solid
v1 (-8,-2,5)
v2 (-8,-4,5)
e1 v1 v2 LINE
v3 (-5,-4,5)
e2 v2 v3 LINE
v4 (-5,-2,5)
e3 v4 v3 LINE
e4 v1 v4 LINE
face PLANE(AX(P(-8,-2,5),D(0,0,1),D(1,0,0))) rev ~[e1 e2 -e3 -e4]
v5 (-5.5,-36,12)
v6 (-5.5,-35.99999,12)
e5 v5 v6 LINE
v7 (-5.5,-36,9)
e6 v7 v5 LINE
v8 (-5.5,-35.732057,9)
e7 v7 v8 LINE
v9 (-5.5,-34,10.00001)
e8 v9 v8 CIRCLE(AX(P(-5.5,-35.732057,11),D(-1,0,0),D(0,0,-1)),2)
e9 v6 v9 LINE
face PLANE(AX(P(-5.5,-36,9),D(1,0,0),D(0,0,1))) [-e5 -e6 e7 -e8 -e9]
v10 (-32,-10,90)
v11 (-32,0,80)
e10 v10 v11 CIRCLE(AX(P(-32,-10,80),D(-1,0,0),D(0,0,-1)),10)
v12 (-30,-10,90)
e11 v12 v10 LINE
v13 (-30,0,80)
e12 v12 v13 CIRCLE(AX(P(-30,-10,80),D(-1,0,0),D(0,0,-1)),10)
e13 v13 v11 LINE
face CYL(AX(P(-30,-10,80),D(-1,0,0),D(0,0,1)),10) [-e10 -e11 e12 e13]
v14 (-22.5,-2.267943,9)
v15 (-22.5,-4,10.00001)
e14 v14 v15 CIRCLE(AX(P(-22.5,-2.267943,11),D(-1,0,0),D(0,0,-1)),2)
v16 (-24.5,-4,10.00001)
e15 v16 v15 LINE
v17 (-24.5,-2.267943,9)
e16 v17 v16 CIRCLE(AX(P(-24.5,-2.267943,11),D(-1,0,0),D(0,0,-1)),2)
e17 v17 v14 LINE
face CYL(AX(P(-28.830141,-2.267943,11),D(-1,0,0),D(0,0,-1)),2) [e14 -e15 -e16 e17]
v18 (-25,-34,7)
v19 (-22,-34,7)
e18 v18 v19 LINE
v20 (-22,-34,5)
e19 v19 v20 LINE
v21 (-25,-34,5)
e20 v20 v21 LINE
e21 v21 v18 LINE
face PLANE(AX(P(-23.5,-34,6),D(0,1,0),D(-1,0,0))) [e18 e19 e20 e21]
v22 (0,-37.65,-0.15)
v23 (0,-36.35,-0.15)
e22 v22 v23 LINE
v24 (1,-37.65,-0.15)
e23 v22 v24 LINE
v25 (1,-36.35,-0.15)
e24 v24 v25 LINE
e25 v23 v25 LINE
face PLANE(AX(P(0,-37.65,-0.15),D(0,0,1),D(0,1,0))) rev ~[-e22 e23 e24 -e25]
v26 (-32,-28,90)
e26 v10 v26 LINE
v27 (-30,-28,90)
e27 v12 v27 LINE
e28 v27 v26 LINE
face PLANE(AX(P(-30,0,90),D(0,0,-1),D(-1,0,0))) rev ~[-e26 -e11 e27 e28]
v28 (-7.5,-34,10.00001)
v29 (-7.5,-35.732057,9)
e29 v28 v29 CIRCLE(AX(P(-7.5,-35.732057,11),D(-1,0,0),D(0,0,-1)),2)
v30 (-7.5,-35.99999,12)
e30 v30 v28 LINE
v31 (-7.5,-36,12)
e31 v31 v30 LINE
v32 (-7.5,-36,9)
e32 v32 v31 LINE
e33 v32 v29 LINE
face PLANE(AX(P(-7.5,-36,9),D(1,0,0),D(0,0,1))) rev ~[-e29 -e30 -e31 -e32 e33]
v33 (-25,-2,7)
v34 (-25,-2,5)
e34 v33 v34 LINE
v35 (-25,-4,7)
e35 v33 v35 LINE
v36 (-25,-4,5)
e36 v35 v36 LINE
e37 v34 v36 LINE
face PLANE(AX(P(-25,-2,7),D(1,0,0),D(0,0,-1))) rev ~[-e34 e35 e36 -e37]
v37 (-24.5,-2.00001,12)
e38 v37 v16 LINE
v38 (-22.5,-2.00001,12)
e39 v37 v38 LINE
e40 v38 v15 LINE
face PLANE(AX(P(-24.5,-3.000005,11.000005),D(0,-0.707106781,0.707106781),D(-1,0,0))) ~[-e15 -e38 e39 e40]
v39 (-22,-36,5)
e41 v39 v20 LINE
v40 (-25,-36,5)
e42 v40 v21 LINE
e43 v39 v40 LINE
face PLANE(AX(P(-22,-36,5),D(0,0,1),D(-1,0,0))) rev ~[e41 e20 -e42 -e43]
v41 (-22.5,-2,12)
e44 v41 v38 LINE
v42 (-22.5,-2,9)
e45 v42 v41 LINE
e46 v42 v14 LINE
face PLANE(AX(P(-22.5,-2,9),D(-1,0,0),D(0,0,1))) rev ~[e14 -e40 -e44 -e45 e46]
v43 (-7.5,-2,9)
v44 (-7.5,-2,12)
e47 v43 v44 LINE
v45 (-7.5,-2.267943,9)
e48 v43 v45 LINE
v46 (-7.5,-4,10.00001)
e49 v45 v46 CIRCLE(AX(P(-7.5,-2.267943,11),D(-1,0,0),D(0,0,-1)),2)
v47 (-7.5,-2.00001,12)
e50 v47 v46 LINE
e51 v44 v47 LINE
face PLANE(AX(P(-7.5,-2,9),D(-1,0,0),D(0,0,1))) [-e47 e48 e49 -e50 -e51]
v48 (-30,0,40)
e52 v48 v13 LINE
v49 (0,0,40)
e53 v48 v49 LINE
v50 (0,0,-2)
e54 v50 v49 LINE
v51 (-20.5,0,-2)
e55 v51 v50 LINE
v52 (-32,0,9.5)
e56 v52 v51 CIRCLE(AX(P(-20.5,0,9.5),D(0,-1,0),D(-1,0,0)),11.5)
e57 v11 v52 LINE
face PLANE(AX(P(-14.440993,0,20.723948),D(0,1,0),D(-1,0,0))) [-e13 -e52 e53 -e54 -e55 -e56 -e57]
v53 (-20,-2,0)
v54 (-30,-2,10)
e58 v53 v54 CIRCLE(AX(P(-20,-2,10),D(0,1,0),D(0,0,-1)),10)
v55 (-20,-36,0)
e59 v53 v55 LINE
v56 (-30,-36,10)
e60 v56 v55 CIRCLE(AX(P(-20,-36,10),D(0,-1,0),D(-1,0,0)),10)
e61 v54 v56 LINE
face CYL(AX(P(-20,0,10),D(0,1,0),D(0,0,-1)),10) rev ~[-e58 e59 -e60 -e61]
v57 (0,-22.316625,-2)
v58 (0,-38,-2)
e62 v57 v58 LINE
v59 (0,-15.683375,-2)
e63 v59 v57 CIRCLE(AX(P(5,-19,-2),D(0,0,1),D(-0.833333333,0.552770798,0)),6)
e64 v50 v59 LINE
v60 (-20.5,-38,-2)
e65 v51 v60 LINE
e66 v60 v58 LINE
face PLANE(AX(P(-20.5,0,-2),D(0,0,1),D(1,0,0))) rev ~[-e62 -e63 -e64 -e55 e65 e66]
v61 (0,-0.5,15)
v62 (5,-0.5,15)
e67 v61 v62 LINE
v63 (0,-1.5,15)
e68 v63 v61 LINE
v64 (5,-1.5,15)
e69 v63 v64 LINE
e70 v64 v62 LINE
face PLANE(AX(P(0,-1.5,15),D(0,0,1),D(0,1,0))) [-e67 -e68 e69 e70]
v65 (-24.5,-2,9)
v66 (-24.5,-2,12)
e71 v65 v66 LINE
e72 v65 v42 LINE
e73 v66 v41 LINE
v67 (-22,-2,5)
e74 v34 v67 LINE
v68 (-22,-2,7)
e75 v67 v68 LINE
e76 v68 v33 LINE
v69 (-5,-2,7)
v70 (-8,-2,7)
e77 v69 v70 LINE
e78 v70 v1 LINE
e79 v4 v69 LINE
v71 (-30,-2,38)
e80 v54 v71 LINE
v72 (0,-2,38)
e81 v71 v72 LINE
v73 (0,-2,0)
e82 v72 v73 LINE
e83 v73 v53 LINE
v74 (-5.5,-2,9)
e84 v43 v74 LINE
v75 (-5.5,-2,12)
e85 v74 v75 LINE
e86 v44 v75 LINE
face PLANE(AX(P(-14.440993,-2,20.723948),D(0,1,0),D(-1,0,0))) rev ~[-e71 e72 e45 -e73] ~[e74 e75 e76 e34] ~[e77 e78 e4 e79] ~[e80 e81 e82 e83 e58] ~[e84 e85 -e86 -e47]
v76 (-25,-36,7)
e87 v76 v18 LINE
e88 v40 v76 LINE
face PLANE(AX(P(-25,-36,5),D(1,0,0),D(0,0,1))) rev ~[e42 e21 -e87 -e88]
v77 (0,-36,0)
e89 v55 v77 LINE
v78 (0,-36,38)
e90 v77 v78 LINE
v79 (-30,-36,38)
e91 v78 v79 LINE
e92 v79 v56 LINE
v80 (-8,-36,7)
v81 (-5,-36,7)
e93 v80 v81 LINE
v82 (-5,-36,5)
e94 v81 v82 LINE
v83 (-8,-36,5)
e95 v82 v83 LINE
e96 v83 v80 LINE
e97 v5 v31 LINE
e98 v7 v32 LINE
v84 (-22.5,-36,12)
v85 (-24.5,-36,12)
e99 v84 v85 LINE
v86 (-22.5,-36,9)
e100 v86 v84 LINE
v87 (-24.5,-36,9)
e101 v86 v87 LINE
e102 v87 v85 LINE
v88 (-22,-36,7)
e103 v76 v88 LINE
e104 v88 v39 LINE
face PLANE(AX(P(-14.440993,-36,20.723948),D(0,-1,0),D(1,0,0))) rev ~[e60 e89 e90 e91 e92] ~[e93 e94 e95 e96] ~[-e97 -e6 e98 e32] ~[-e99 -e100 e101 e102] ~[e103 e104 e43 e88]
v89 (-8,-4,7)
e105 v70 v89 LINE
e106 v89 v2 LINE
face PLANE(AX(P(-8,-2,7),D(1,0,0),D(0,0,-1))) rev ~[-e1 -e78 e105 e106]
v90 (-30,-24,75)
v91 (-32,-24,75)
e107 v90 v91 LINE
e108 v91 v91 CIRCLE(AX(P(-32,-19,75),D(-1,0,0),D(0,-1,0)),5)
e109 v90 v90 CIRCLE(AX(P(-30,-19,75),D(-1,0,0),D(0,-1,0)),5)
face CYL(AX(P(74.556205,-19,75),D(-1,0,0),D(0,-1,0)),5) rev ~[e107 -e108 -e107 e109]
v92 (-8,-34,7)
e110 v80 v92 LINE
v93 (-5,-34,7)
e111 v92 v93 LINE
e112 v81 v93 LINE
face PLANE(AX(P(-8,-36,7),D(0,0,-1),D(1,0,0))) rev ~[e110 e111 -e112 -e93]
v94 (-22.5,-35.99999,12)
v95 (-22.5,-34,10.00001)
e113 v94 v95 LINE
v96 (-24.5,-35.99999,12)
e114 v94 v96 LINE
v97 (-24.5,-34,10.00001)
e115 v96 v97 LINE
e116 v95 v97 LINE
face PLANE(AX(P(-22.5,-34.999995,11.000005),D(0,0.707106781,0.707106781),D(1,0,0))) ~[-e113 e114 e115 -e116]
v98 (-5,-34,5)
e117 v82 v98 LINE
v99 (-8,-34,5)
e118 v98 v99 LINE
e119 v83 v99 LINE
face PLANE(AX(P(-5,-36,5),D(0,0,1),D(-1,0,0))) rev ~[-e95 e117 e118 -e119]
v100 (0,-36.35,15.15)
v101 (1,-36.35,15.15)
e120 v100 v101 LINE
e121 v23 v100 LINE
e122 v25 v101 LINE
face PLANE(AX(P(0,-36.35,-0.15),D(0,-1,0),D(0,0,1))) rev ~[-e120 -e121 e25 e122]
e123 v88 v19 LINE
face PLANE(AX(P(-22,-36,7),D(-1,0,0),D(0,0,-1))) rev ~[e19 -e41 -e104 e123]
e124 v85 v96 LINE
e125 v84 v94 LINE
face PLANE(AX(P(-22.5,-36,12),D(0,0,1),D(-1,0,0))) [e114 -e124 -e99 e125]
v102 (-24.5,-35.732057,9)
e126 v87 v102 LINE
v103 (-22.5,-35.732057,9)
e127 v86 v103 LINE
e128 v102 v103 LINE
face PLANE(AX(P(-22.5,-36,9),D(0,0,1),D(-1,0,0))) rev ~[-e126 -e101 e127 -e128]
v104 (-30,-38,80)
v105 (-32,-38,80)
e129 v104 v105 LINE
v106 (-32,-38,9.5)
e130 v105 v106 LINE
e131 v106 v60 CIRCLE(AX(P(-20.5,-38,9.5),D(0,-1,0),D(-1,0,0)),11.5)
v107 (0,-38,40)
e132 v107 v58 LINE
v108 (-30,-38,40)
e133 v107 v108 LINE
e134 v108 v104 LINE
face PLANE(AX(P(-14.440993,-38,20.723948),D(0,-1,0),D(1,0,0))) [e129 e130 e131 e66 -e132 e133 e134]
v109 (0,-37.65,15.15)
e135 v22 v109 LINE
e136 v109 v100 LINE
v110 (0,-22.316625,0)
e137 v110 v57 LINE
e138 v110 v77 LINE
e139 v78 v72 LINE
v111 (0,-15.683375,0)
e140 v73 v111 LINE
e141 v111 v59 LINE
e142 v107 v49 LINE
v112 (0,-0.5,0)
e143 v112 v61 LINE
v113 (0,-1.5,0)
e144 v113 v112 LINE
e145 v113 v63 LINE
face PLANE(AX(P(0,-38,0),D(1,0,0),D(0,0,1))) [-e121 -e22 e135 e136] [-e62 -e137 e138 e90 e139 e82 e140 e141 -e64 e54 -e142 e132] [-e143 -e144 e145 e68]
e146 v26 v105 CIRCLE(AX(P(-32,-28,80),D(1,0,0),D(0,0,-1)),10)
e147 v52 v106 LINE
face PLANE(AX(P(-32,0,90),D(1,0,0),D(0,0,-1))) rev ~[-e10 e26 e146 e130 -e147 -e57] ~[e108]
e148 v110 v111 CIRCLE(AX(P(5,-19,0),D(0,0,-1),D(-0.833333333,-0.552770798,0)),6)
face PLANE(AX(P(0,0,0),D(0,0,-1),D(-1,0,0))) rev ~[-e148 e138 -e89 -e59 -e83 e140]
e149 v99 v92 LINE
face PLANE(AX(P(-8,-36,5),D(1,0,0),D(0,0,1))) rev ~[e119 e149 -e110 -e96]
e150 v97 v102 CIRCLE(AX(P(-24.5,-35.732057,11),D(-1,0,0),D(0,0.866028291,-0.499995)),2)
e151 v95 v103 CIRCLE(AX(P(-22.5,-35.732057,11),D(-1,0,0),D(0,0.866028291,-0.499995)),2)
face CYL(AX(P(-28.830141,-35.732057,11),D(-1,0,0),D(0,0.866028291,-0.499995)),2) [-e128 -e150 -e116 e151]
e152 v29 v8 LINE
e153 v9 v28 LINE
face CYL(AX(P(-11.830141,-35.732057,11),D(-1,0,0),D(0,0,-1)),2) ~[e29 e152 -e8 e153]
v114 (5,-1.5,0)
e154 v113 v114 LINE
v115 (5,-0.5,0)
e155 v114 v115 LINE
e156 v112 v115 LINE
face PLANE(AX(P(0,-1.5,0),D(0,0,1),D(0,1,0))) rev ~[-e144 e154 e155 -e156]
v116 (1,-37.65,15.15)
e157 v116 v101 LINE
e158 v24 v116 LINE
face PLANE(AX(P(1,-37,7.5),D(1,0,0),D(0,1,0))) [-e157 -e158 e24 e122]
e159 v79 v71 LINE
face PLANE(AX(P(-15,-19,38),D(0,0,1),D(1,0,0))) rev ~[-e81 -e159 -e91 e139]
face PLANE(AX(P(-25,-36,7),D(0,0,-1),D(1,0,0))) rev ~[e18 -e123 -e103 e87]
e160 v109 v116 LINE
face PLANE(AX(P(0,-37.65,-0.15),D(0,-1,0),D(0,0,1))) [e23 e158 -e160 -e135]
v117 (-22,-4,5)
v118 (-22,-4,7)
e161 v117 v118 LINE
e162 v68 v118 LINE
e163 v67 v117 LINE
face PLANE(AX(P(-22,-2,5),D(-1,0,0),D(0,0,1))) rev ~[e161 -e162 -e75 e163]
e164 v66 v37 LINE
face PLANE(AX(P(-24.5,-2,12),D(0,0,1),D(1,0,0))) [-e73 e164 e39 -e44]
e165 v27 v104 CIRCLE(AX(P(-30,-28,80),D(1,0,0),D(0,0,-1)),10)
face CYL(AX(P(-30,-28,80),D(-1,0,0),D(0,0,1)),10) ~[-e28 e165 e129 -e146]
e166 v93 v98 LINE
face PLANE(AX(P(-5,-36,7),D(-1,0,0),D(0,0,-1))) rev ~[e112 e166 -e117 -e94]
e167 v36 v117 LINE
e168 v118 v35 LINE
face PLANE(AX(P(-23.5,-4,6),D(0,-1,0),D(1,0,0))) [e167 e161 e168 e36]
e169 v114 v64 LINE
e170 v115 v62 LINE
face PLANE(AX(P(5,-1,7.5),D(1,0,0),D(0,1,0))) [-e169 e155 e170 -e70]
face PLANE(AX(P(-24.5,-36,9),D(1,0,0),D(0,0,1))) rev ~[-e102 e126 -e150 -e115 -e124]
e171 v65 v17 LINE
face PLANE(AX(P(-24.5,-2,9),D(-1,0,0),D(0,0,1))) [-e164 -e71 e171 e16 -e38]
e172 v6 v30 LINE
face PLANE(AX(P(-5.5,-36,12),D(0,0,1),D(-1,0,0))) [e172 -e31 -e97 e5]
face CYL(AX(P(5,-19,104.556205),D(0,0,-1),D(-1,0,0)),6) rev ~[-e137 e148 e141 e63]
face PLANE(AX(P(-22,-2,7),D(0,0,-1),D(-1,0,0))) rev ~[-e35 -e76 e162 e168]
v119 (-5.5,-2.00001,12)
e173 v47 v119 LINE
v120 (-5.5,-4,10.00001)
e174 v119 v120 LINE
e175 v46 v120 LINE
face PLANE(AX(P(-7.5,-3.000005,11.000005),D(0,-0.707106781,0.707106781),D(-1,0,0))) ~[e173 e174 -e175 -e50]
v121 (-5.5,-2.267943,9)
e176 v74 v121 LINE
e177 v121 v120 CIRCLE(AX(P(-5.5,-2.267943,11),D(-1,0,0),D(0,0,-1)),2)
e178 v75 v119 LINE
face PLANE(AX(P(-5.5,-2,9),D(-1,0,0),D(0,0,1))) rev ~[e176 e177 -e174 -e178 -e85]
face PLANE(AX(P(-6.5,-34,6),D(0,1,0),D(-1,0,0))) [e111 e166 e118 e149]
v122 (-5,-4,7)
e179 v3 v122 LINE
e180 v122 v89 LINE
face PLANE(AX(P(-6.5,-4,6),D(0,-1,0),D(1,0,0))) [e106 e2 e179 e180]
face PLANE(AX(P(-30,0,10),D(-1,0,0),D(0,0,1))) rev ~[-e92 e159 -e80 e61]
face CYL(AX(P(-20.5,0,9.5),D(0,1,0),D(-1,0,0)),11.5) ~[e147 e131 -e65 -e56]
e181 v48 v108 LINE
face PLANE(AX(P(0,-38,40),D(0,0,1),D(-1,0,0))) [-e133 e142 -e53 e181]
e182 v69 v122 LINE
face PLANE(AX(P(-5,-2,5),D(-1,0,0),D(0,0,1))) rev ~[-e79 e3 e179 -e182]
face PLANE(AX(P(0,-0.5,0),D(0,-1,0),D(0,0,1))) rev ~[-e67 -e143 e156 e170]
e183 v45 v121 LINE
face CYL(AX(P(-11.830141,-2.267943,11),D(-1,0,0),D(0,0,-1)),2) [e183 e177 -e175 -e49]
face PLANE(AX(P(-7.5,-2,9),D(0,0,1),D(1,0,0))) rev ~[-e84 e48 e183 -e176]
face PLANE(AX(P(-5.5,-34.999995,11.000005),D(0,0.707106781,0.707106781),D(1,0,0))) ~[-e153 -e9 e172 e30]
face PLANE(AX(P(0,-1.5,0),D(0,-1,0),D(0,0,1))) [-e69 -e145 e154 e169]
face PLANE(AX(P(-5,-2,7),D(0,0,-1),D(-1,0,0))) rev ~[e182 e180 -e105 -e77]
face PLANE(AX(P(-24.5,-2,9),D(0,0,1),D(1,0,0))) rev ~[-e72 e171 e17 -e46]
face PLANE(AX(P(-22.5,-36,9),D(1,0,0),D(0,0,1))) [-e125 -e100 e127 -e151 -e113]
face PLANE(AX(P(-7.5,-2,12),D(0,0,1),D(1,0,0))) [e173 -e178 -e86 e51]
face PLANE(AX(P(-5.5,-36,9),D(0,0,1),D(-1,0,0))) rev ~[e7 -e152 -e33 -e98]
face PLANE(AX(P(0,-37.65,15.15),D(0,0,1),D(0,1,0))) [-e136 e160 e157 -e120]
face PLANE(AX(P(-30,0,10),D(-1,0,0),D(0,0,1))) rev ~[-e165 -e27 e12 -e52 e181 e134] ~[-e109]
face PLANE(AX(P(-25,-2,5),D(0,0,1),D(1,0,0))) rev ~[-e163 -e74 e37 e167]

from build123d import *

# Parameters (mm, degrees)
F1_DEPTH     = 38
F3_D         = 12
F4_R         = 10
F6_D         = 10
F8_DEPTH     = 2
F10_DEPTH    = 2
F11_W        = 30
F11_H        = 38
F12_DEPTH    = 2
F14_W        = 1
F14_H        = 15
F15_DEPTH    = 5
F16_W        = 2
F16_H        = 3
F18_DEPTH    = 2
F17_W        = 2
F17_H        = 3
F19_DEPTH    = 2
F20_SIZE     = 1.99999
F21_T1_DEPTH = 10.6602829052
F21_T3_DEPTH = 10.6602829052
F14_W_2      = 1.3
F14_H_2      = 15.3
F22_DEPTH    = 1


# Not quite as in the source:
# - a fillet or chamfer that OpenCascade refuses, or shapes differently, is made with other operations: its cross-section is extruded or revolved along the edge and cut away or added
# - a fillet or chamfer is up to 0.001 mm smaller than in the source, because OpenCascade refuses the exact size
# - a feature names something its author has since deleted; it is built from what else it names


with BuildPart() as f1:
    # F0 (on Front) → F1 (new body)
    with BuildSketch(Plane.XZ):
        with BuildLine():
            Line((-30, 90), (-32, 90))
            Line((-32, 90), (-32, 9.5))
            ThreePointArc((-32, 9.5), (-28.6317279836, 1.3682720164), (-20.5, -2))
            Line((-20.5, -2), (0, -2))
            Line((0, -2), (0, 0))
            Line((0, 0), (-20, 0))
            ThreePointArc((-20, 0), (-27.0710678119, 2.9289321881), (-30, 10))
            Line((-30, 10), (-30, 90))
        make_face()
    extrude(amount=F1_DEPTH)

    # F3 (through all)
    with Locations(Plane.XY):
        with Locations((5, -19)):
            Hole(F3_D / 2)

    # F4
    f4_edges = [f1.edges().sort_by_distance(p)[0] for p in [
        (-31, -38, 90),
        (-31, 0, 90),
    ]]
    fillet(f4_edges, radius=F4_R)

    # F6 (through all)
    with Locations(Plane.YZ.offset(-30)):
        with Locations((-19, 75)):
            Hole(F6_D / 2)

    # F7 (on face) → F8 (join)
    with BuildSketch(Plane.XZ.offset(38)):
        with BuildLine():
            Line((-20, 0), (0, 0))
            Line((0, 0), (0, 40))
            Line((0, 40), (-30, 40))
            Line((-30, 40), (-30, 10))
            ThreePointArc((-30, 10), (-27.0710678119, 2.9289321881), (-20, 0))
        make_face()
    extrude(amount=-F8_DEPTH)

    # F9 (on face) → F10 (join)
    with BuildSketch(Plane(origin=(0, 0, 0), x_dir=(-1, 0, 0), z_dir=(0, 1, 0))):
        with BuildLine():
            Line((0, 40), (0, 0))
            Line((0, 0), (20, 0))
            ThreePointArc((20, 0), (27.0710678119, 2.9289321881), (30, 10))
            Line((30, 10), (30, 40))
            Line((30, 40), (0, 40))
        make_face()
    extrude(amount=-F10_DEPTH)

    # F11 (on face) → F12 (join)
    with BuildSketch(Plane.XY.offset(40)):
        with Locations((-15, -19)):
            Rectangle(F11_W, F11_H)
    extrude(amount=-F12_DEPTH)

    # F13: union 

    # F14 (on face) → F15 (join)
    with BuildSketch(Plane.YZ):
        with Locations((-1, 7.5)):
            Rectangle(F14_W, F14_H)
    extrude(amount=F15_DEPTH)

    # F16 (on face) → F18 (join)
    with BuildSketch(Plane.XZ.offset(2)):
        with Locations((-6.5, 10.5)):
            Rectangle(F16_W, F16_H)
        Polygon((-5, 5), (-5, 6), (-5, 7), (-8, 7), (-8, 5), align=None)
        with Locations((-23.5, 10.5)):
            Rectangle(F16_W, F16_H)
        Polygon((-25, 7), (-25, 6), (-25, 5), (-22, 5), (-22, 7), align=None)
    extrude(amount=F18_DEPTH)

    # F17 (on face) → F19 (join)
    with BuildSketch(Plane(origin=(0, -36, 0), x_dir=(-1, 0, 0), z_dir=(0, 1, 0))):
        with Locations((6.5, 10.5)):
            Rectangle(F17_W, F17_H)
        Polygon((5, 7), (5, 6), (5, 5), (8, 5), (8, 7), align=None)
        Polygon((25, 5), (25, 6), (25, 7), (22, 7), (22, 5), align=None)
        with Locations((23.5, 10.5)):
            Rectangle(F17_W, F17_H)
    extrude(amount=F19_DEPTH)

    # F20 (size 2 in the source; OpenCascade refuses exactly that, so slightly less here)
    f20_edges = [f1.edges().sort_by_distance(p)[0] for p in [
        (-6.5, -34, 12),
        (-23.5, -34, 12),
        (-6.5, -4, 12),
        (-23.5, -4, 12),
    ]]
    chamfer(f20_edges, length=F20_SIZE)

    # F21: fillet of radius 2 on 4 edges, made by hand

    # F21_s2 → F21_t1 (cut)
    with BuildSketch(Plane.YZ.offset(-11.8301414526)):
        with BuildLine():
            ThreePointArc((-35.732056581, 9), (-34.732051581, 9.2679520792), (-34, 10.00001))
            Line((-34, 10.00001), (-34, 9))
            Line((-34, 9), (-35.732056581, 9))
        make_face()
        with BuildLine():
            ThreePointArc((-2.267943419, 9), (-3.267948419, 9.2679520792), (-4, 10.00001))
            Line((-4, 10.00001), (-4, 9))
            Line((-4, 9), (-2.267943419, 9))
        make_face()
    extrude(amount=F21_T1_DEPTH, mode=Mode.SUBTRACT)

    # F21_s4 → F21_t3 (cut)
    with BuildSketch(Plane.YZ.offset(-28.8301414526)):
        with BuildLine():
            ThreePointArc((-34, 10.00001), (-34.732051581, 9.2679520792), (-35.732056581, 9))
            Line((-35.732056581, 9), (-34, 9))
            Line((-34, 9), (-34, 10.00001))
        make_face()
        with BuildLine():
            ThreePointArc((-2.267943419, 9), (-3.267948419, 9.2679520792), (-4, 10.00001))
            Line((-4, 10.00001), (-4, 9))
            Line((-4, 9), (-2.267943419, 9))
        make_face()
    extrude(amount=F21_T3_DEPTH, mode=Mode.SUBTRACT)

    # F14 (on face) → F22 (join)
    with BuildSketch(Plane.YZ):
        with Locations((-37, 7.5)):
            Rectangle(F14_W_2, F14_H_2)
    extrude(amount=F22_DEPTH)


solid = f1.part
